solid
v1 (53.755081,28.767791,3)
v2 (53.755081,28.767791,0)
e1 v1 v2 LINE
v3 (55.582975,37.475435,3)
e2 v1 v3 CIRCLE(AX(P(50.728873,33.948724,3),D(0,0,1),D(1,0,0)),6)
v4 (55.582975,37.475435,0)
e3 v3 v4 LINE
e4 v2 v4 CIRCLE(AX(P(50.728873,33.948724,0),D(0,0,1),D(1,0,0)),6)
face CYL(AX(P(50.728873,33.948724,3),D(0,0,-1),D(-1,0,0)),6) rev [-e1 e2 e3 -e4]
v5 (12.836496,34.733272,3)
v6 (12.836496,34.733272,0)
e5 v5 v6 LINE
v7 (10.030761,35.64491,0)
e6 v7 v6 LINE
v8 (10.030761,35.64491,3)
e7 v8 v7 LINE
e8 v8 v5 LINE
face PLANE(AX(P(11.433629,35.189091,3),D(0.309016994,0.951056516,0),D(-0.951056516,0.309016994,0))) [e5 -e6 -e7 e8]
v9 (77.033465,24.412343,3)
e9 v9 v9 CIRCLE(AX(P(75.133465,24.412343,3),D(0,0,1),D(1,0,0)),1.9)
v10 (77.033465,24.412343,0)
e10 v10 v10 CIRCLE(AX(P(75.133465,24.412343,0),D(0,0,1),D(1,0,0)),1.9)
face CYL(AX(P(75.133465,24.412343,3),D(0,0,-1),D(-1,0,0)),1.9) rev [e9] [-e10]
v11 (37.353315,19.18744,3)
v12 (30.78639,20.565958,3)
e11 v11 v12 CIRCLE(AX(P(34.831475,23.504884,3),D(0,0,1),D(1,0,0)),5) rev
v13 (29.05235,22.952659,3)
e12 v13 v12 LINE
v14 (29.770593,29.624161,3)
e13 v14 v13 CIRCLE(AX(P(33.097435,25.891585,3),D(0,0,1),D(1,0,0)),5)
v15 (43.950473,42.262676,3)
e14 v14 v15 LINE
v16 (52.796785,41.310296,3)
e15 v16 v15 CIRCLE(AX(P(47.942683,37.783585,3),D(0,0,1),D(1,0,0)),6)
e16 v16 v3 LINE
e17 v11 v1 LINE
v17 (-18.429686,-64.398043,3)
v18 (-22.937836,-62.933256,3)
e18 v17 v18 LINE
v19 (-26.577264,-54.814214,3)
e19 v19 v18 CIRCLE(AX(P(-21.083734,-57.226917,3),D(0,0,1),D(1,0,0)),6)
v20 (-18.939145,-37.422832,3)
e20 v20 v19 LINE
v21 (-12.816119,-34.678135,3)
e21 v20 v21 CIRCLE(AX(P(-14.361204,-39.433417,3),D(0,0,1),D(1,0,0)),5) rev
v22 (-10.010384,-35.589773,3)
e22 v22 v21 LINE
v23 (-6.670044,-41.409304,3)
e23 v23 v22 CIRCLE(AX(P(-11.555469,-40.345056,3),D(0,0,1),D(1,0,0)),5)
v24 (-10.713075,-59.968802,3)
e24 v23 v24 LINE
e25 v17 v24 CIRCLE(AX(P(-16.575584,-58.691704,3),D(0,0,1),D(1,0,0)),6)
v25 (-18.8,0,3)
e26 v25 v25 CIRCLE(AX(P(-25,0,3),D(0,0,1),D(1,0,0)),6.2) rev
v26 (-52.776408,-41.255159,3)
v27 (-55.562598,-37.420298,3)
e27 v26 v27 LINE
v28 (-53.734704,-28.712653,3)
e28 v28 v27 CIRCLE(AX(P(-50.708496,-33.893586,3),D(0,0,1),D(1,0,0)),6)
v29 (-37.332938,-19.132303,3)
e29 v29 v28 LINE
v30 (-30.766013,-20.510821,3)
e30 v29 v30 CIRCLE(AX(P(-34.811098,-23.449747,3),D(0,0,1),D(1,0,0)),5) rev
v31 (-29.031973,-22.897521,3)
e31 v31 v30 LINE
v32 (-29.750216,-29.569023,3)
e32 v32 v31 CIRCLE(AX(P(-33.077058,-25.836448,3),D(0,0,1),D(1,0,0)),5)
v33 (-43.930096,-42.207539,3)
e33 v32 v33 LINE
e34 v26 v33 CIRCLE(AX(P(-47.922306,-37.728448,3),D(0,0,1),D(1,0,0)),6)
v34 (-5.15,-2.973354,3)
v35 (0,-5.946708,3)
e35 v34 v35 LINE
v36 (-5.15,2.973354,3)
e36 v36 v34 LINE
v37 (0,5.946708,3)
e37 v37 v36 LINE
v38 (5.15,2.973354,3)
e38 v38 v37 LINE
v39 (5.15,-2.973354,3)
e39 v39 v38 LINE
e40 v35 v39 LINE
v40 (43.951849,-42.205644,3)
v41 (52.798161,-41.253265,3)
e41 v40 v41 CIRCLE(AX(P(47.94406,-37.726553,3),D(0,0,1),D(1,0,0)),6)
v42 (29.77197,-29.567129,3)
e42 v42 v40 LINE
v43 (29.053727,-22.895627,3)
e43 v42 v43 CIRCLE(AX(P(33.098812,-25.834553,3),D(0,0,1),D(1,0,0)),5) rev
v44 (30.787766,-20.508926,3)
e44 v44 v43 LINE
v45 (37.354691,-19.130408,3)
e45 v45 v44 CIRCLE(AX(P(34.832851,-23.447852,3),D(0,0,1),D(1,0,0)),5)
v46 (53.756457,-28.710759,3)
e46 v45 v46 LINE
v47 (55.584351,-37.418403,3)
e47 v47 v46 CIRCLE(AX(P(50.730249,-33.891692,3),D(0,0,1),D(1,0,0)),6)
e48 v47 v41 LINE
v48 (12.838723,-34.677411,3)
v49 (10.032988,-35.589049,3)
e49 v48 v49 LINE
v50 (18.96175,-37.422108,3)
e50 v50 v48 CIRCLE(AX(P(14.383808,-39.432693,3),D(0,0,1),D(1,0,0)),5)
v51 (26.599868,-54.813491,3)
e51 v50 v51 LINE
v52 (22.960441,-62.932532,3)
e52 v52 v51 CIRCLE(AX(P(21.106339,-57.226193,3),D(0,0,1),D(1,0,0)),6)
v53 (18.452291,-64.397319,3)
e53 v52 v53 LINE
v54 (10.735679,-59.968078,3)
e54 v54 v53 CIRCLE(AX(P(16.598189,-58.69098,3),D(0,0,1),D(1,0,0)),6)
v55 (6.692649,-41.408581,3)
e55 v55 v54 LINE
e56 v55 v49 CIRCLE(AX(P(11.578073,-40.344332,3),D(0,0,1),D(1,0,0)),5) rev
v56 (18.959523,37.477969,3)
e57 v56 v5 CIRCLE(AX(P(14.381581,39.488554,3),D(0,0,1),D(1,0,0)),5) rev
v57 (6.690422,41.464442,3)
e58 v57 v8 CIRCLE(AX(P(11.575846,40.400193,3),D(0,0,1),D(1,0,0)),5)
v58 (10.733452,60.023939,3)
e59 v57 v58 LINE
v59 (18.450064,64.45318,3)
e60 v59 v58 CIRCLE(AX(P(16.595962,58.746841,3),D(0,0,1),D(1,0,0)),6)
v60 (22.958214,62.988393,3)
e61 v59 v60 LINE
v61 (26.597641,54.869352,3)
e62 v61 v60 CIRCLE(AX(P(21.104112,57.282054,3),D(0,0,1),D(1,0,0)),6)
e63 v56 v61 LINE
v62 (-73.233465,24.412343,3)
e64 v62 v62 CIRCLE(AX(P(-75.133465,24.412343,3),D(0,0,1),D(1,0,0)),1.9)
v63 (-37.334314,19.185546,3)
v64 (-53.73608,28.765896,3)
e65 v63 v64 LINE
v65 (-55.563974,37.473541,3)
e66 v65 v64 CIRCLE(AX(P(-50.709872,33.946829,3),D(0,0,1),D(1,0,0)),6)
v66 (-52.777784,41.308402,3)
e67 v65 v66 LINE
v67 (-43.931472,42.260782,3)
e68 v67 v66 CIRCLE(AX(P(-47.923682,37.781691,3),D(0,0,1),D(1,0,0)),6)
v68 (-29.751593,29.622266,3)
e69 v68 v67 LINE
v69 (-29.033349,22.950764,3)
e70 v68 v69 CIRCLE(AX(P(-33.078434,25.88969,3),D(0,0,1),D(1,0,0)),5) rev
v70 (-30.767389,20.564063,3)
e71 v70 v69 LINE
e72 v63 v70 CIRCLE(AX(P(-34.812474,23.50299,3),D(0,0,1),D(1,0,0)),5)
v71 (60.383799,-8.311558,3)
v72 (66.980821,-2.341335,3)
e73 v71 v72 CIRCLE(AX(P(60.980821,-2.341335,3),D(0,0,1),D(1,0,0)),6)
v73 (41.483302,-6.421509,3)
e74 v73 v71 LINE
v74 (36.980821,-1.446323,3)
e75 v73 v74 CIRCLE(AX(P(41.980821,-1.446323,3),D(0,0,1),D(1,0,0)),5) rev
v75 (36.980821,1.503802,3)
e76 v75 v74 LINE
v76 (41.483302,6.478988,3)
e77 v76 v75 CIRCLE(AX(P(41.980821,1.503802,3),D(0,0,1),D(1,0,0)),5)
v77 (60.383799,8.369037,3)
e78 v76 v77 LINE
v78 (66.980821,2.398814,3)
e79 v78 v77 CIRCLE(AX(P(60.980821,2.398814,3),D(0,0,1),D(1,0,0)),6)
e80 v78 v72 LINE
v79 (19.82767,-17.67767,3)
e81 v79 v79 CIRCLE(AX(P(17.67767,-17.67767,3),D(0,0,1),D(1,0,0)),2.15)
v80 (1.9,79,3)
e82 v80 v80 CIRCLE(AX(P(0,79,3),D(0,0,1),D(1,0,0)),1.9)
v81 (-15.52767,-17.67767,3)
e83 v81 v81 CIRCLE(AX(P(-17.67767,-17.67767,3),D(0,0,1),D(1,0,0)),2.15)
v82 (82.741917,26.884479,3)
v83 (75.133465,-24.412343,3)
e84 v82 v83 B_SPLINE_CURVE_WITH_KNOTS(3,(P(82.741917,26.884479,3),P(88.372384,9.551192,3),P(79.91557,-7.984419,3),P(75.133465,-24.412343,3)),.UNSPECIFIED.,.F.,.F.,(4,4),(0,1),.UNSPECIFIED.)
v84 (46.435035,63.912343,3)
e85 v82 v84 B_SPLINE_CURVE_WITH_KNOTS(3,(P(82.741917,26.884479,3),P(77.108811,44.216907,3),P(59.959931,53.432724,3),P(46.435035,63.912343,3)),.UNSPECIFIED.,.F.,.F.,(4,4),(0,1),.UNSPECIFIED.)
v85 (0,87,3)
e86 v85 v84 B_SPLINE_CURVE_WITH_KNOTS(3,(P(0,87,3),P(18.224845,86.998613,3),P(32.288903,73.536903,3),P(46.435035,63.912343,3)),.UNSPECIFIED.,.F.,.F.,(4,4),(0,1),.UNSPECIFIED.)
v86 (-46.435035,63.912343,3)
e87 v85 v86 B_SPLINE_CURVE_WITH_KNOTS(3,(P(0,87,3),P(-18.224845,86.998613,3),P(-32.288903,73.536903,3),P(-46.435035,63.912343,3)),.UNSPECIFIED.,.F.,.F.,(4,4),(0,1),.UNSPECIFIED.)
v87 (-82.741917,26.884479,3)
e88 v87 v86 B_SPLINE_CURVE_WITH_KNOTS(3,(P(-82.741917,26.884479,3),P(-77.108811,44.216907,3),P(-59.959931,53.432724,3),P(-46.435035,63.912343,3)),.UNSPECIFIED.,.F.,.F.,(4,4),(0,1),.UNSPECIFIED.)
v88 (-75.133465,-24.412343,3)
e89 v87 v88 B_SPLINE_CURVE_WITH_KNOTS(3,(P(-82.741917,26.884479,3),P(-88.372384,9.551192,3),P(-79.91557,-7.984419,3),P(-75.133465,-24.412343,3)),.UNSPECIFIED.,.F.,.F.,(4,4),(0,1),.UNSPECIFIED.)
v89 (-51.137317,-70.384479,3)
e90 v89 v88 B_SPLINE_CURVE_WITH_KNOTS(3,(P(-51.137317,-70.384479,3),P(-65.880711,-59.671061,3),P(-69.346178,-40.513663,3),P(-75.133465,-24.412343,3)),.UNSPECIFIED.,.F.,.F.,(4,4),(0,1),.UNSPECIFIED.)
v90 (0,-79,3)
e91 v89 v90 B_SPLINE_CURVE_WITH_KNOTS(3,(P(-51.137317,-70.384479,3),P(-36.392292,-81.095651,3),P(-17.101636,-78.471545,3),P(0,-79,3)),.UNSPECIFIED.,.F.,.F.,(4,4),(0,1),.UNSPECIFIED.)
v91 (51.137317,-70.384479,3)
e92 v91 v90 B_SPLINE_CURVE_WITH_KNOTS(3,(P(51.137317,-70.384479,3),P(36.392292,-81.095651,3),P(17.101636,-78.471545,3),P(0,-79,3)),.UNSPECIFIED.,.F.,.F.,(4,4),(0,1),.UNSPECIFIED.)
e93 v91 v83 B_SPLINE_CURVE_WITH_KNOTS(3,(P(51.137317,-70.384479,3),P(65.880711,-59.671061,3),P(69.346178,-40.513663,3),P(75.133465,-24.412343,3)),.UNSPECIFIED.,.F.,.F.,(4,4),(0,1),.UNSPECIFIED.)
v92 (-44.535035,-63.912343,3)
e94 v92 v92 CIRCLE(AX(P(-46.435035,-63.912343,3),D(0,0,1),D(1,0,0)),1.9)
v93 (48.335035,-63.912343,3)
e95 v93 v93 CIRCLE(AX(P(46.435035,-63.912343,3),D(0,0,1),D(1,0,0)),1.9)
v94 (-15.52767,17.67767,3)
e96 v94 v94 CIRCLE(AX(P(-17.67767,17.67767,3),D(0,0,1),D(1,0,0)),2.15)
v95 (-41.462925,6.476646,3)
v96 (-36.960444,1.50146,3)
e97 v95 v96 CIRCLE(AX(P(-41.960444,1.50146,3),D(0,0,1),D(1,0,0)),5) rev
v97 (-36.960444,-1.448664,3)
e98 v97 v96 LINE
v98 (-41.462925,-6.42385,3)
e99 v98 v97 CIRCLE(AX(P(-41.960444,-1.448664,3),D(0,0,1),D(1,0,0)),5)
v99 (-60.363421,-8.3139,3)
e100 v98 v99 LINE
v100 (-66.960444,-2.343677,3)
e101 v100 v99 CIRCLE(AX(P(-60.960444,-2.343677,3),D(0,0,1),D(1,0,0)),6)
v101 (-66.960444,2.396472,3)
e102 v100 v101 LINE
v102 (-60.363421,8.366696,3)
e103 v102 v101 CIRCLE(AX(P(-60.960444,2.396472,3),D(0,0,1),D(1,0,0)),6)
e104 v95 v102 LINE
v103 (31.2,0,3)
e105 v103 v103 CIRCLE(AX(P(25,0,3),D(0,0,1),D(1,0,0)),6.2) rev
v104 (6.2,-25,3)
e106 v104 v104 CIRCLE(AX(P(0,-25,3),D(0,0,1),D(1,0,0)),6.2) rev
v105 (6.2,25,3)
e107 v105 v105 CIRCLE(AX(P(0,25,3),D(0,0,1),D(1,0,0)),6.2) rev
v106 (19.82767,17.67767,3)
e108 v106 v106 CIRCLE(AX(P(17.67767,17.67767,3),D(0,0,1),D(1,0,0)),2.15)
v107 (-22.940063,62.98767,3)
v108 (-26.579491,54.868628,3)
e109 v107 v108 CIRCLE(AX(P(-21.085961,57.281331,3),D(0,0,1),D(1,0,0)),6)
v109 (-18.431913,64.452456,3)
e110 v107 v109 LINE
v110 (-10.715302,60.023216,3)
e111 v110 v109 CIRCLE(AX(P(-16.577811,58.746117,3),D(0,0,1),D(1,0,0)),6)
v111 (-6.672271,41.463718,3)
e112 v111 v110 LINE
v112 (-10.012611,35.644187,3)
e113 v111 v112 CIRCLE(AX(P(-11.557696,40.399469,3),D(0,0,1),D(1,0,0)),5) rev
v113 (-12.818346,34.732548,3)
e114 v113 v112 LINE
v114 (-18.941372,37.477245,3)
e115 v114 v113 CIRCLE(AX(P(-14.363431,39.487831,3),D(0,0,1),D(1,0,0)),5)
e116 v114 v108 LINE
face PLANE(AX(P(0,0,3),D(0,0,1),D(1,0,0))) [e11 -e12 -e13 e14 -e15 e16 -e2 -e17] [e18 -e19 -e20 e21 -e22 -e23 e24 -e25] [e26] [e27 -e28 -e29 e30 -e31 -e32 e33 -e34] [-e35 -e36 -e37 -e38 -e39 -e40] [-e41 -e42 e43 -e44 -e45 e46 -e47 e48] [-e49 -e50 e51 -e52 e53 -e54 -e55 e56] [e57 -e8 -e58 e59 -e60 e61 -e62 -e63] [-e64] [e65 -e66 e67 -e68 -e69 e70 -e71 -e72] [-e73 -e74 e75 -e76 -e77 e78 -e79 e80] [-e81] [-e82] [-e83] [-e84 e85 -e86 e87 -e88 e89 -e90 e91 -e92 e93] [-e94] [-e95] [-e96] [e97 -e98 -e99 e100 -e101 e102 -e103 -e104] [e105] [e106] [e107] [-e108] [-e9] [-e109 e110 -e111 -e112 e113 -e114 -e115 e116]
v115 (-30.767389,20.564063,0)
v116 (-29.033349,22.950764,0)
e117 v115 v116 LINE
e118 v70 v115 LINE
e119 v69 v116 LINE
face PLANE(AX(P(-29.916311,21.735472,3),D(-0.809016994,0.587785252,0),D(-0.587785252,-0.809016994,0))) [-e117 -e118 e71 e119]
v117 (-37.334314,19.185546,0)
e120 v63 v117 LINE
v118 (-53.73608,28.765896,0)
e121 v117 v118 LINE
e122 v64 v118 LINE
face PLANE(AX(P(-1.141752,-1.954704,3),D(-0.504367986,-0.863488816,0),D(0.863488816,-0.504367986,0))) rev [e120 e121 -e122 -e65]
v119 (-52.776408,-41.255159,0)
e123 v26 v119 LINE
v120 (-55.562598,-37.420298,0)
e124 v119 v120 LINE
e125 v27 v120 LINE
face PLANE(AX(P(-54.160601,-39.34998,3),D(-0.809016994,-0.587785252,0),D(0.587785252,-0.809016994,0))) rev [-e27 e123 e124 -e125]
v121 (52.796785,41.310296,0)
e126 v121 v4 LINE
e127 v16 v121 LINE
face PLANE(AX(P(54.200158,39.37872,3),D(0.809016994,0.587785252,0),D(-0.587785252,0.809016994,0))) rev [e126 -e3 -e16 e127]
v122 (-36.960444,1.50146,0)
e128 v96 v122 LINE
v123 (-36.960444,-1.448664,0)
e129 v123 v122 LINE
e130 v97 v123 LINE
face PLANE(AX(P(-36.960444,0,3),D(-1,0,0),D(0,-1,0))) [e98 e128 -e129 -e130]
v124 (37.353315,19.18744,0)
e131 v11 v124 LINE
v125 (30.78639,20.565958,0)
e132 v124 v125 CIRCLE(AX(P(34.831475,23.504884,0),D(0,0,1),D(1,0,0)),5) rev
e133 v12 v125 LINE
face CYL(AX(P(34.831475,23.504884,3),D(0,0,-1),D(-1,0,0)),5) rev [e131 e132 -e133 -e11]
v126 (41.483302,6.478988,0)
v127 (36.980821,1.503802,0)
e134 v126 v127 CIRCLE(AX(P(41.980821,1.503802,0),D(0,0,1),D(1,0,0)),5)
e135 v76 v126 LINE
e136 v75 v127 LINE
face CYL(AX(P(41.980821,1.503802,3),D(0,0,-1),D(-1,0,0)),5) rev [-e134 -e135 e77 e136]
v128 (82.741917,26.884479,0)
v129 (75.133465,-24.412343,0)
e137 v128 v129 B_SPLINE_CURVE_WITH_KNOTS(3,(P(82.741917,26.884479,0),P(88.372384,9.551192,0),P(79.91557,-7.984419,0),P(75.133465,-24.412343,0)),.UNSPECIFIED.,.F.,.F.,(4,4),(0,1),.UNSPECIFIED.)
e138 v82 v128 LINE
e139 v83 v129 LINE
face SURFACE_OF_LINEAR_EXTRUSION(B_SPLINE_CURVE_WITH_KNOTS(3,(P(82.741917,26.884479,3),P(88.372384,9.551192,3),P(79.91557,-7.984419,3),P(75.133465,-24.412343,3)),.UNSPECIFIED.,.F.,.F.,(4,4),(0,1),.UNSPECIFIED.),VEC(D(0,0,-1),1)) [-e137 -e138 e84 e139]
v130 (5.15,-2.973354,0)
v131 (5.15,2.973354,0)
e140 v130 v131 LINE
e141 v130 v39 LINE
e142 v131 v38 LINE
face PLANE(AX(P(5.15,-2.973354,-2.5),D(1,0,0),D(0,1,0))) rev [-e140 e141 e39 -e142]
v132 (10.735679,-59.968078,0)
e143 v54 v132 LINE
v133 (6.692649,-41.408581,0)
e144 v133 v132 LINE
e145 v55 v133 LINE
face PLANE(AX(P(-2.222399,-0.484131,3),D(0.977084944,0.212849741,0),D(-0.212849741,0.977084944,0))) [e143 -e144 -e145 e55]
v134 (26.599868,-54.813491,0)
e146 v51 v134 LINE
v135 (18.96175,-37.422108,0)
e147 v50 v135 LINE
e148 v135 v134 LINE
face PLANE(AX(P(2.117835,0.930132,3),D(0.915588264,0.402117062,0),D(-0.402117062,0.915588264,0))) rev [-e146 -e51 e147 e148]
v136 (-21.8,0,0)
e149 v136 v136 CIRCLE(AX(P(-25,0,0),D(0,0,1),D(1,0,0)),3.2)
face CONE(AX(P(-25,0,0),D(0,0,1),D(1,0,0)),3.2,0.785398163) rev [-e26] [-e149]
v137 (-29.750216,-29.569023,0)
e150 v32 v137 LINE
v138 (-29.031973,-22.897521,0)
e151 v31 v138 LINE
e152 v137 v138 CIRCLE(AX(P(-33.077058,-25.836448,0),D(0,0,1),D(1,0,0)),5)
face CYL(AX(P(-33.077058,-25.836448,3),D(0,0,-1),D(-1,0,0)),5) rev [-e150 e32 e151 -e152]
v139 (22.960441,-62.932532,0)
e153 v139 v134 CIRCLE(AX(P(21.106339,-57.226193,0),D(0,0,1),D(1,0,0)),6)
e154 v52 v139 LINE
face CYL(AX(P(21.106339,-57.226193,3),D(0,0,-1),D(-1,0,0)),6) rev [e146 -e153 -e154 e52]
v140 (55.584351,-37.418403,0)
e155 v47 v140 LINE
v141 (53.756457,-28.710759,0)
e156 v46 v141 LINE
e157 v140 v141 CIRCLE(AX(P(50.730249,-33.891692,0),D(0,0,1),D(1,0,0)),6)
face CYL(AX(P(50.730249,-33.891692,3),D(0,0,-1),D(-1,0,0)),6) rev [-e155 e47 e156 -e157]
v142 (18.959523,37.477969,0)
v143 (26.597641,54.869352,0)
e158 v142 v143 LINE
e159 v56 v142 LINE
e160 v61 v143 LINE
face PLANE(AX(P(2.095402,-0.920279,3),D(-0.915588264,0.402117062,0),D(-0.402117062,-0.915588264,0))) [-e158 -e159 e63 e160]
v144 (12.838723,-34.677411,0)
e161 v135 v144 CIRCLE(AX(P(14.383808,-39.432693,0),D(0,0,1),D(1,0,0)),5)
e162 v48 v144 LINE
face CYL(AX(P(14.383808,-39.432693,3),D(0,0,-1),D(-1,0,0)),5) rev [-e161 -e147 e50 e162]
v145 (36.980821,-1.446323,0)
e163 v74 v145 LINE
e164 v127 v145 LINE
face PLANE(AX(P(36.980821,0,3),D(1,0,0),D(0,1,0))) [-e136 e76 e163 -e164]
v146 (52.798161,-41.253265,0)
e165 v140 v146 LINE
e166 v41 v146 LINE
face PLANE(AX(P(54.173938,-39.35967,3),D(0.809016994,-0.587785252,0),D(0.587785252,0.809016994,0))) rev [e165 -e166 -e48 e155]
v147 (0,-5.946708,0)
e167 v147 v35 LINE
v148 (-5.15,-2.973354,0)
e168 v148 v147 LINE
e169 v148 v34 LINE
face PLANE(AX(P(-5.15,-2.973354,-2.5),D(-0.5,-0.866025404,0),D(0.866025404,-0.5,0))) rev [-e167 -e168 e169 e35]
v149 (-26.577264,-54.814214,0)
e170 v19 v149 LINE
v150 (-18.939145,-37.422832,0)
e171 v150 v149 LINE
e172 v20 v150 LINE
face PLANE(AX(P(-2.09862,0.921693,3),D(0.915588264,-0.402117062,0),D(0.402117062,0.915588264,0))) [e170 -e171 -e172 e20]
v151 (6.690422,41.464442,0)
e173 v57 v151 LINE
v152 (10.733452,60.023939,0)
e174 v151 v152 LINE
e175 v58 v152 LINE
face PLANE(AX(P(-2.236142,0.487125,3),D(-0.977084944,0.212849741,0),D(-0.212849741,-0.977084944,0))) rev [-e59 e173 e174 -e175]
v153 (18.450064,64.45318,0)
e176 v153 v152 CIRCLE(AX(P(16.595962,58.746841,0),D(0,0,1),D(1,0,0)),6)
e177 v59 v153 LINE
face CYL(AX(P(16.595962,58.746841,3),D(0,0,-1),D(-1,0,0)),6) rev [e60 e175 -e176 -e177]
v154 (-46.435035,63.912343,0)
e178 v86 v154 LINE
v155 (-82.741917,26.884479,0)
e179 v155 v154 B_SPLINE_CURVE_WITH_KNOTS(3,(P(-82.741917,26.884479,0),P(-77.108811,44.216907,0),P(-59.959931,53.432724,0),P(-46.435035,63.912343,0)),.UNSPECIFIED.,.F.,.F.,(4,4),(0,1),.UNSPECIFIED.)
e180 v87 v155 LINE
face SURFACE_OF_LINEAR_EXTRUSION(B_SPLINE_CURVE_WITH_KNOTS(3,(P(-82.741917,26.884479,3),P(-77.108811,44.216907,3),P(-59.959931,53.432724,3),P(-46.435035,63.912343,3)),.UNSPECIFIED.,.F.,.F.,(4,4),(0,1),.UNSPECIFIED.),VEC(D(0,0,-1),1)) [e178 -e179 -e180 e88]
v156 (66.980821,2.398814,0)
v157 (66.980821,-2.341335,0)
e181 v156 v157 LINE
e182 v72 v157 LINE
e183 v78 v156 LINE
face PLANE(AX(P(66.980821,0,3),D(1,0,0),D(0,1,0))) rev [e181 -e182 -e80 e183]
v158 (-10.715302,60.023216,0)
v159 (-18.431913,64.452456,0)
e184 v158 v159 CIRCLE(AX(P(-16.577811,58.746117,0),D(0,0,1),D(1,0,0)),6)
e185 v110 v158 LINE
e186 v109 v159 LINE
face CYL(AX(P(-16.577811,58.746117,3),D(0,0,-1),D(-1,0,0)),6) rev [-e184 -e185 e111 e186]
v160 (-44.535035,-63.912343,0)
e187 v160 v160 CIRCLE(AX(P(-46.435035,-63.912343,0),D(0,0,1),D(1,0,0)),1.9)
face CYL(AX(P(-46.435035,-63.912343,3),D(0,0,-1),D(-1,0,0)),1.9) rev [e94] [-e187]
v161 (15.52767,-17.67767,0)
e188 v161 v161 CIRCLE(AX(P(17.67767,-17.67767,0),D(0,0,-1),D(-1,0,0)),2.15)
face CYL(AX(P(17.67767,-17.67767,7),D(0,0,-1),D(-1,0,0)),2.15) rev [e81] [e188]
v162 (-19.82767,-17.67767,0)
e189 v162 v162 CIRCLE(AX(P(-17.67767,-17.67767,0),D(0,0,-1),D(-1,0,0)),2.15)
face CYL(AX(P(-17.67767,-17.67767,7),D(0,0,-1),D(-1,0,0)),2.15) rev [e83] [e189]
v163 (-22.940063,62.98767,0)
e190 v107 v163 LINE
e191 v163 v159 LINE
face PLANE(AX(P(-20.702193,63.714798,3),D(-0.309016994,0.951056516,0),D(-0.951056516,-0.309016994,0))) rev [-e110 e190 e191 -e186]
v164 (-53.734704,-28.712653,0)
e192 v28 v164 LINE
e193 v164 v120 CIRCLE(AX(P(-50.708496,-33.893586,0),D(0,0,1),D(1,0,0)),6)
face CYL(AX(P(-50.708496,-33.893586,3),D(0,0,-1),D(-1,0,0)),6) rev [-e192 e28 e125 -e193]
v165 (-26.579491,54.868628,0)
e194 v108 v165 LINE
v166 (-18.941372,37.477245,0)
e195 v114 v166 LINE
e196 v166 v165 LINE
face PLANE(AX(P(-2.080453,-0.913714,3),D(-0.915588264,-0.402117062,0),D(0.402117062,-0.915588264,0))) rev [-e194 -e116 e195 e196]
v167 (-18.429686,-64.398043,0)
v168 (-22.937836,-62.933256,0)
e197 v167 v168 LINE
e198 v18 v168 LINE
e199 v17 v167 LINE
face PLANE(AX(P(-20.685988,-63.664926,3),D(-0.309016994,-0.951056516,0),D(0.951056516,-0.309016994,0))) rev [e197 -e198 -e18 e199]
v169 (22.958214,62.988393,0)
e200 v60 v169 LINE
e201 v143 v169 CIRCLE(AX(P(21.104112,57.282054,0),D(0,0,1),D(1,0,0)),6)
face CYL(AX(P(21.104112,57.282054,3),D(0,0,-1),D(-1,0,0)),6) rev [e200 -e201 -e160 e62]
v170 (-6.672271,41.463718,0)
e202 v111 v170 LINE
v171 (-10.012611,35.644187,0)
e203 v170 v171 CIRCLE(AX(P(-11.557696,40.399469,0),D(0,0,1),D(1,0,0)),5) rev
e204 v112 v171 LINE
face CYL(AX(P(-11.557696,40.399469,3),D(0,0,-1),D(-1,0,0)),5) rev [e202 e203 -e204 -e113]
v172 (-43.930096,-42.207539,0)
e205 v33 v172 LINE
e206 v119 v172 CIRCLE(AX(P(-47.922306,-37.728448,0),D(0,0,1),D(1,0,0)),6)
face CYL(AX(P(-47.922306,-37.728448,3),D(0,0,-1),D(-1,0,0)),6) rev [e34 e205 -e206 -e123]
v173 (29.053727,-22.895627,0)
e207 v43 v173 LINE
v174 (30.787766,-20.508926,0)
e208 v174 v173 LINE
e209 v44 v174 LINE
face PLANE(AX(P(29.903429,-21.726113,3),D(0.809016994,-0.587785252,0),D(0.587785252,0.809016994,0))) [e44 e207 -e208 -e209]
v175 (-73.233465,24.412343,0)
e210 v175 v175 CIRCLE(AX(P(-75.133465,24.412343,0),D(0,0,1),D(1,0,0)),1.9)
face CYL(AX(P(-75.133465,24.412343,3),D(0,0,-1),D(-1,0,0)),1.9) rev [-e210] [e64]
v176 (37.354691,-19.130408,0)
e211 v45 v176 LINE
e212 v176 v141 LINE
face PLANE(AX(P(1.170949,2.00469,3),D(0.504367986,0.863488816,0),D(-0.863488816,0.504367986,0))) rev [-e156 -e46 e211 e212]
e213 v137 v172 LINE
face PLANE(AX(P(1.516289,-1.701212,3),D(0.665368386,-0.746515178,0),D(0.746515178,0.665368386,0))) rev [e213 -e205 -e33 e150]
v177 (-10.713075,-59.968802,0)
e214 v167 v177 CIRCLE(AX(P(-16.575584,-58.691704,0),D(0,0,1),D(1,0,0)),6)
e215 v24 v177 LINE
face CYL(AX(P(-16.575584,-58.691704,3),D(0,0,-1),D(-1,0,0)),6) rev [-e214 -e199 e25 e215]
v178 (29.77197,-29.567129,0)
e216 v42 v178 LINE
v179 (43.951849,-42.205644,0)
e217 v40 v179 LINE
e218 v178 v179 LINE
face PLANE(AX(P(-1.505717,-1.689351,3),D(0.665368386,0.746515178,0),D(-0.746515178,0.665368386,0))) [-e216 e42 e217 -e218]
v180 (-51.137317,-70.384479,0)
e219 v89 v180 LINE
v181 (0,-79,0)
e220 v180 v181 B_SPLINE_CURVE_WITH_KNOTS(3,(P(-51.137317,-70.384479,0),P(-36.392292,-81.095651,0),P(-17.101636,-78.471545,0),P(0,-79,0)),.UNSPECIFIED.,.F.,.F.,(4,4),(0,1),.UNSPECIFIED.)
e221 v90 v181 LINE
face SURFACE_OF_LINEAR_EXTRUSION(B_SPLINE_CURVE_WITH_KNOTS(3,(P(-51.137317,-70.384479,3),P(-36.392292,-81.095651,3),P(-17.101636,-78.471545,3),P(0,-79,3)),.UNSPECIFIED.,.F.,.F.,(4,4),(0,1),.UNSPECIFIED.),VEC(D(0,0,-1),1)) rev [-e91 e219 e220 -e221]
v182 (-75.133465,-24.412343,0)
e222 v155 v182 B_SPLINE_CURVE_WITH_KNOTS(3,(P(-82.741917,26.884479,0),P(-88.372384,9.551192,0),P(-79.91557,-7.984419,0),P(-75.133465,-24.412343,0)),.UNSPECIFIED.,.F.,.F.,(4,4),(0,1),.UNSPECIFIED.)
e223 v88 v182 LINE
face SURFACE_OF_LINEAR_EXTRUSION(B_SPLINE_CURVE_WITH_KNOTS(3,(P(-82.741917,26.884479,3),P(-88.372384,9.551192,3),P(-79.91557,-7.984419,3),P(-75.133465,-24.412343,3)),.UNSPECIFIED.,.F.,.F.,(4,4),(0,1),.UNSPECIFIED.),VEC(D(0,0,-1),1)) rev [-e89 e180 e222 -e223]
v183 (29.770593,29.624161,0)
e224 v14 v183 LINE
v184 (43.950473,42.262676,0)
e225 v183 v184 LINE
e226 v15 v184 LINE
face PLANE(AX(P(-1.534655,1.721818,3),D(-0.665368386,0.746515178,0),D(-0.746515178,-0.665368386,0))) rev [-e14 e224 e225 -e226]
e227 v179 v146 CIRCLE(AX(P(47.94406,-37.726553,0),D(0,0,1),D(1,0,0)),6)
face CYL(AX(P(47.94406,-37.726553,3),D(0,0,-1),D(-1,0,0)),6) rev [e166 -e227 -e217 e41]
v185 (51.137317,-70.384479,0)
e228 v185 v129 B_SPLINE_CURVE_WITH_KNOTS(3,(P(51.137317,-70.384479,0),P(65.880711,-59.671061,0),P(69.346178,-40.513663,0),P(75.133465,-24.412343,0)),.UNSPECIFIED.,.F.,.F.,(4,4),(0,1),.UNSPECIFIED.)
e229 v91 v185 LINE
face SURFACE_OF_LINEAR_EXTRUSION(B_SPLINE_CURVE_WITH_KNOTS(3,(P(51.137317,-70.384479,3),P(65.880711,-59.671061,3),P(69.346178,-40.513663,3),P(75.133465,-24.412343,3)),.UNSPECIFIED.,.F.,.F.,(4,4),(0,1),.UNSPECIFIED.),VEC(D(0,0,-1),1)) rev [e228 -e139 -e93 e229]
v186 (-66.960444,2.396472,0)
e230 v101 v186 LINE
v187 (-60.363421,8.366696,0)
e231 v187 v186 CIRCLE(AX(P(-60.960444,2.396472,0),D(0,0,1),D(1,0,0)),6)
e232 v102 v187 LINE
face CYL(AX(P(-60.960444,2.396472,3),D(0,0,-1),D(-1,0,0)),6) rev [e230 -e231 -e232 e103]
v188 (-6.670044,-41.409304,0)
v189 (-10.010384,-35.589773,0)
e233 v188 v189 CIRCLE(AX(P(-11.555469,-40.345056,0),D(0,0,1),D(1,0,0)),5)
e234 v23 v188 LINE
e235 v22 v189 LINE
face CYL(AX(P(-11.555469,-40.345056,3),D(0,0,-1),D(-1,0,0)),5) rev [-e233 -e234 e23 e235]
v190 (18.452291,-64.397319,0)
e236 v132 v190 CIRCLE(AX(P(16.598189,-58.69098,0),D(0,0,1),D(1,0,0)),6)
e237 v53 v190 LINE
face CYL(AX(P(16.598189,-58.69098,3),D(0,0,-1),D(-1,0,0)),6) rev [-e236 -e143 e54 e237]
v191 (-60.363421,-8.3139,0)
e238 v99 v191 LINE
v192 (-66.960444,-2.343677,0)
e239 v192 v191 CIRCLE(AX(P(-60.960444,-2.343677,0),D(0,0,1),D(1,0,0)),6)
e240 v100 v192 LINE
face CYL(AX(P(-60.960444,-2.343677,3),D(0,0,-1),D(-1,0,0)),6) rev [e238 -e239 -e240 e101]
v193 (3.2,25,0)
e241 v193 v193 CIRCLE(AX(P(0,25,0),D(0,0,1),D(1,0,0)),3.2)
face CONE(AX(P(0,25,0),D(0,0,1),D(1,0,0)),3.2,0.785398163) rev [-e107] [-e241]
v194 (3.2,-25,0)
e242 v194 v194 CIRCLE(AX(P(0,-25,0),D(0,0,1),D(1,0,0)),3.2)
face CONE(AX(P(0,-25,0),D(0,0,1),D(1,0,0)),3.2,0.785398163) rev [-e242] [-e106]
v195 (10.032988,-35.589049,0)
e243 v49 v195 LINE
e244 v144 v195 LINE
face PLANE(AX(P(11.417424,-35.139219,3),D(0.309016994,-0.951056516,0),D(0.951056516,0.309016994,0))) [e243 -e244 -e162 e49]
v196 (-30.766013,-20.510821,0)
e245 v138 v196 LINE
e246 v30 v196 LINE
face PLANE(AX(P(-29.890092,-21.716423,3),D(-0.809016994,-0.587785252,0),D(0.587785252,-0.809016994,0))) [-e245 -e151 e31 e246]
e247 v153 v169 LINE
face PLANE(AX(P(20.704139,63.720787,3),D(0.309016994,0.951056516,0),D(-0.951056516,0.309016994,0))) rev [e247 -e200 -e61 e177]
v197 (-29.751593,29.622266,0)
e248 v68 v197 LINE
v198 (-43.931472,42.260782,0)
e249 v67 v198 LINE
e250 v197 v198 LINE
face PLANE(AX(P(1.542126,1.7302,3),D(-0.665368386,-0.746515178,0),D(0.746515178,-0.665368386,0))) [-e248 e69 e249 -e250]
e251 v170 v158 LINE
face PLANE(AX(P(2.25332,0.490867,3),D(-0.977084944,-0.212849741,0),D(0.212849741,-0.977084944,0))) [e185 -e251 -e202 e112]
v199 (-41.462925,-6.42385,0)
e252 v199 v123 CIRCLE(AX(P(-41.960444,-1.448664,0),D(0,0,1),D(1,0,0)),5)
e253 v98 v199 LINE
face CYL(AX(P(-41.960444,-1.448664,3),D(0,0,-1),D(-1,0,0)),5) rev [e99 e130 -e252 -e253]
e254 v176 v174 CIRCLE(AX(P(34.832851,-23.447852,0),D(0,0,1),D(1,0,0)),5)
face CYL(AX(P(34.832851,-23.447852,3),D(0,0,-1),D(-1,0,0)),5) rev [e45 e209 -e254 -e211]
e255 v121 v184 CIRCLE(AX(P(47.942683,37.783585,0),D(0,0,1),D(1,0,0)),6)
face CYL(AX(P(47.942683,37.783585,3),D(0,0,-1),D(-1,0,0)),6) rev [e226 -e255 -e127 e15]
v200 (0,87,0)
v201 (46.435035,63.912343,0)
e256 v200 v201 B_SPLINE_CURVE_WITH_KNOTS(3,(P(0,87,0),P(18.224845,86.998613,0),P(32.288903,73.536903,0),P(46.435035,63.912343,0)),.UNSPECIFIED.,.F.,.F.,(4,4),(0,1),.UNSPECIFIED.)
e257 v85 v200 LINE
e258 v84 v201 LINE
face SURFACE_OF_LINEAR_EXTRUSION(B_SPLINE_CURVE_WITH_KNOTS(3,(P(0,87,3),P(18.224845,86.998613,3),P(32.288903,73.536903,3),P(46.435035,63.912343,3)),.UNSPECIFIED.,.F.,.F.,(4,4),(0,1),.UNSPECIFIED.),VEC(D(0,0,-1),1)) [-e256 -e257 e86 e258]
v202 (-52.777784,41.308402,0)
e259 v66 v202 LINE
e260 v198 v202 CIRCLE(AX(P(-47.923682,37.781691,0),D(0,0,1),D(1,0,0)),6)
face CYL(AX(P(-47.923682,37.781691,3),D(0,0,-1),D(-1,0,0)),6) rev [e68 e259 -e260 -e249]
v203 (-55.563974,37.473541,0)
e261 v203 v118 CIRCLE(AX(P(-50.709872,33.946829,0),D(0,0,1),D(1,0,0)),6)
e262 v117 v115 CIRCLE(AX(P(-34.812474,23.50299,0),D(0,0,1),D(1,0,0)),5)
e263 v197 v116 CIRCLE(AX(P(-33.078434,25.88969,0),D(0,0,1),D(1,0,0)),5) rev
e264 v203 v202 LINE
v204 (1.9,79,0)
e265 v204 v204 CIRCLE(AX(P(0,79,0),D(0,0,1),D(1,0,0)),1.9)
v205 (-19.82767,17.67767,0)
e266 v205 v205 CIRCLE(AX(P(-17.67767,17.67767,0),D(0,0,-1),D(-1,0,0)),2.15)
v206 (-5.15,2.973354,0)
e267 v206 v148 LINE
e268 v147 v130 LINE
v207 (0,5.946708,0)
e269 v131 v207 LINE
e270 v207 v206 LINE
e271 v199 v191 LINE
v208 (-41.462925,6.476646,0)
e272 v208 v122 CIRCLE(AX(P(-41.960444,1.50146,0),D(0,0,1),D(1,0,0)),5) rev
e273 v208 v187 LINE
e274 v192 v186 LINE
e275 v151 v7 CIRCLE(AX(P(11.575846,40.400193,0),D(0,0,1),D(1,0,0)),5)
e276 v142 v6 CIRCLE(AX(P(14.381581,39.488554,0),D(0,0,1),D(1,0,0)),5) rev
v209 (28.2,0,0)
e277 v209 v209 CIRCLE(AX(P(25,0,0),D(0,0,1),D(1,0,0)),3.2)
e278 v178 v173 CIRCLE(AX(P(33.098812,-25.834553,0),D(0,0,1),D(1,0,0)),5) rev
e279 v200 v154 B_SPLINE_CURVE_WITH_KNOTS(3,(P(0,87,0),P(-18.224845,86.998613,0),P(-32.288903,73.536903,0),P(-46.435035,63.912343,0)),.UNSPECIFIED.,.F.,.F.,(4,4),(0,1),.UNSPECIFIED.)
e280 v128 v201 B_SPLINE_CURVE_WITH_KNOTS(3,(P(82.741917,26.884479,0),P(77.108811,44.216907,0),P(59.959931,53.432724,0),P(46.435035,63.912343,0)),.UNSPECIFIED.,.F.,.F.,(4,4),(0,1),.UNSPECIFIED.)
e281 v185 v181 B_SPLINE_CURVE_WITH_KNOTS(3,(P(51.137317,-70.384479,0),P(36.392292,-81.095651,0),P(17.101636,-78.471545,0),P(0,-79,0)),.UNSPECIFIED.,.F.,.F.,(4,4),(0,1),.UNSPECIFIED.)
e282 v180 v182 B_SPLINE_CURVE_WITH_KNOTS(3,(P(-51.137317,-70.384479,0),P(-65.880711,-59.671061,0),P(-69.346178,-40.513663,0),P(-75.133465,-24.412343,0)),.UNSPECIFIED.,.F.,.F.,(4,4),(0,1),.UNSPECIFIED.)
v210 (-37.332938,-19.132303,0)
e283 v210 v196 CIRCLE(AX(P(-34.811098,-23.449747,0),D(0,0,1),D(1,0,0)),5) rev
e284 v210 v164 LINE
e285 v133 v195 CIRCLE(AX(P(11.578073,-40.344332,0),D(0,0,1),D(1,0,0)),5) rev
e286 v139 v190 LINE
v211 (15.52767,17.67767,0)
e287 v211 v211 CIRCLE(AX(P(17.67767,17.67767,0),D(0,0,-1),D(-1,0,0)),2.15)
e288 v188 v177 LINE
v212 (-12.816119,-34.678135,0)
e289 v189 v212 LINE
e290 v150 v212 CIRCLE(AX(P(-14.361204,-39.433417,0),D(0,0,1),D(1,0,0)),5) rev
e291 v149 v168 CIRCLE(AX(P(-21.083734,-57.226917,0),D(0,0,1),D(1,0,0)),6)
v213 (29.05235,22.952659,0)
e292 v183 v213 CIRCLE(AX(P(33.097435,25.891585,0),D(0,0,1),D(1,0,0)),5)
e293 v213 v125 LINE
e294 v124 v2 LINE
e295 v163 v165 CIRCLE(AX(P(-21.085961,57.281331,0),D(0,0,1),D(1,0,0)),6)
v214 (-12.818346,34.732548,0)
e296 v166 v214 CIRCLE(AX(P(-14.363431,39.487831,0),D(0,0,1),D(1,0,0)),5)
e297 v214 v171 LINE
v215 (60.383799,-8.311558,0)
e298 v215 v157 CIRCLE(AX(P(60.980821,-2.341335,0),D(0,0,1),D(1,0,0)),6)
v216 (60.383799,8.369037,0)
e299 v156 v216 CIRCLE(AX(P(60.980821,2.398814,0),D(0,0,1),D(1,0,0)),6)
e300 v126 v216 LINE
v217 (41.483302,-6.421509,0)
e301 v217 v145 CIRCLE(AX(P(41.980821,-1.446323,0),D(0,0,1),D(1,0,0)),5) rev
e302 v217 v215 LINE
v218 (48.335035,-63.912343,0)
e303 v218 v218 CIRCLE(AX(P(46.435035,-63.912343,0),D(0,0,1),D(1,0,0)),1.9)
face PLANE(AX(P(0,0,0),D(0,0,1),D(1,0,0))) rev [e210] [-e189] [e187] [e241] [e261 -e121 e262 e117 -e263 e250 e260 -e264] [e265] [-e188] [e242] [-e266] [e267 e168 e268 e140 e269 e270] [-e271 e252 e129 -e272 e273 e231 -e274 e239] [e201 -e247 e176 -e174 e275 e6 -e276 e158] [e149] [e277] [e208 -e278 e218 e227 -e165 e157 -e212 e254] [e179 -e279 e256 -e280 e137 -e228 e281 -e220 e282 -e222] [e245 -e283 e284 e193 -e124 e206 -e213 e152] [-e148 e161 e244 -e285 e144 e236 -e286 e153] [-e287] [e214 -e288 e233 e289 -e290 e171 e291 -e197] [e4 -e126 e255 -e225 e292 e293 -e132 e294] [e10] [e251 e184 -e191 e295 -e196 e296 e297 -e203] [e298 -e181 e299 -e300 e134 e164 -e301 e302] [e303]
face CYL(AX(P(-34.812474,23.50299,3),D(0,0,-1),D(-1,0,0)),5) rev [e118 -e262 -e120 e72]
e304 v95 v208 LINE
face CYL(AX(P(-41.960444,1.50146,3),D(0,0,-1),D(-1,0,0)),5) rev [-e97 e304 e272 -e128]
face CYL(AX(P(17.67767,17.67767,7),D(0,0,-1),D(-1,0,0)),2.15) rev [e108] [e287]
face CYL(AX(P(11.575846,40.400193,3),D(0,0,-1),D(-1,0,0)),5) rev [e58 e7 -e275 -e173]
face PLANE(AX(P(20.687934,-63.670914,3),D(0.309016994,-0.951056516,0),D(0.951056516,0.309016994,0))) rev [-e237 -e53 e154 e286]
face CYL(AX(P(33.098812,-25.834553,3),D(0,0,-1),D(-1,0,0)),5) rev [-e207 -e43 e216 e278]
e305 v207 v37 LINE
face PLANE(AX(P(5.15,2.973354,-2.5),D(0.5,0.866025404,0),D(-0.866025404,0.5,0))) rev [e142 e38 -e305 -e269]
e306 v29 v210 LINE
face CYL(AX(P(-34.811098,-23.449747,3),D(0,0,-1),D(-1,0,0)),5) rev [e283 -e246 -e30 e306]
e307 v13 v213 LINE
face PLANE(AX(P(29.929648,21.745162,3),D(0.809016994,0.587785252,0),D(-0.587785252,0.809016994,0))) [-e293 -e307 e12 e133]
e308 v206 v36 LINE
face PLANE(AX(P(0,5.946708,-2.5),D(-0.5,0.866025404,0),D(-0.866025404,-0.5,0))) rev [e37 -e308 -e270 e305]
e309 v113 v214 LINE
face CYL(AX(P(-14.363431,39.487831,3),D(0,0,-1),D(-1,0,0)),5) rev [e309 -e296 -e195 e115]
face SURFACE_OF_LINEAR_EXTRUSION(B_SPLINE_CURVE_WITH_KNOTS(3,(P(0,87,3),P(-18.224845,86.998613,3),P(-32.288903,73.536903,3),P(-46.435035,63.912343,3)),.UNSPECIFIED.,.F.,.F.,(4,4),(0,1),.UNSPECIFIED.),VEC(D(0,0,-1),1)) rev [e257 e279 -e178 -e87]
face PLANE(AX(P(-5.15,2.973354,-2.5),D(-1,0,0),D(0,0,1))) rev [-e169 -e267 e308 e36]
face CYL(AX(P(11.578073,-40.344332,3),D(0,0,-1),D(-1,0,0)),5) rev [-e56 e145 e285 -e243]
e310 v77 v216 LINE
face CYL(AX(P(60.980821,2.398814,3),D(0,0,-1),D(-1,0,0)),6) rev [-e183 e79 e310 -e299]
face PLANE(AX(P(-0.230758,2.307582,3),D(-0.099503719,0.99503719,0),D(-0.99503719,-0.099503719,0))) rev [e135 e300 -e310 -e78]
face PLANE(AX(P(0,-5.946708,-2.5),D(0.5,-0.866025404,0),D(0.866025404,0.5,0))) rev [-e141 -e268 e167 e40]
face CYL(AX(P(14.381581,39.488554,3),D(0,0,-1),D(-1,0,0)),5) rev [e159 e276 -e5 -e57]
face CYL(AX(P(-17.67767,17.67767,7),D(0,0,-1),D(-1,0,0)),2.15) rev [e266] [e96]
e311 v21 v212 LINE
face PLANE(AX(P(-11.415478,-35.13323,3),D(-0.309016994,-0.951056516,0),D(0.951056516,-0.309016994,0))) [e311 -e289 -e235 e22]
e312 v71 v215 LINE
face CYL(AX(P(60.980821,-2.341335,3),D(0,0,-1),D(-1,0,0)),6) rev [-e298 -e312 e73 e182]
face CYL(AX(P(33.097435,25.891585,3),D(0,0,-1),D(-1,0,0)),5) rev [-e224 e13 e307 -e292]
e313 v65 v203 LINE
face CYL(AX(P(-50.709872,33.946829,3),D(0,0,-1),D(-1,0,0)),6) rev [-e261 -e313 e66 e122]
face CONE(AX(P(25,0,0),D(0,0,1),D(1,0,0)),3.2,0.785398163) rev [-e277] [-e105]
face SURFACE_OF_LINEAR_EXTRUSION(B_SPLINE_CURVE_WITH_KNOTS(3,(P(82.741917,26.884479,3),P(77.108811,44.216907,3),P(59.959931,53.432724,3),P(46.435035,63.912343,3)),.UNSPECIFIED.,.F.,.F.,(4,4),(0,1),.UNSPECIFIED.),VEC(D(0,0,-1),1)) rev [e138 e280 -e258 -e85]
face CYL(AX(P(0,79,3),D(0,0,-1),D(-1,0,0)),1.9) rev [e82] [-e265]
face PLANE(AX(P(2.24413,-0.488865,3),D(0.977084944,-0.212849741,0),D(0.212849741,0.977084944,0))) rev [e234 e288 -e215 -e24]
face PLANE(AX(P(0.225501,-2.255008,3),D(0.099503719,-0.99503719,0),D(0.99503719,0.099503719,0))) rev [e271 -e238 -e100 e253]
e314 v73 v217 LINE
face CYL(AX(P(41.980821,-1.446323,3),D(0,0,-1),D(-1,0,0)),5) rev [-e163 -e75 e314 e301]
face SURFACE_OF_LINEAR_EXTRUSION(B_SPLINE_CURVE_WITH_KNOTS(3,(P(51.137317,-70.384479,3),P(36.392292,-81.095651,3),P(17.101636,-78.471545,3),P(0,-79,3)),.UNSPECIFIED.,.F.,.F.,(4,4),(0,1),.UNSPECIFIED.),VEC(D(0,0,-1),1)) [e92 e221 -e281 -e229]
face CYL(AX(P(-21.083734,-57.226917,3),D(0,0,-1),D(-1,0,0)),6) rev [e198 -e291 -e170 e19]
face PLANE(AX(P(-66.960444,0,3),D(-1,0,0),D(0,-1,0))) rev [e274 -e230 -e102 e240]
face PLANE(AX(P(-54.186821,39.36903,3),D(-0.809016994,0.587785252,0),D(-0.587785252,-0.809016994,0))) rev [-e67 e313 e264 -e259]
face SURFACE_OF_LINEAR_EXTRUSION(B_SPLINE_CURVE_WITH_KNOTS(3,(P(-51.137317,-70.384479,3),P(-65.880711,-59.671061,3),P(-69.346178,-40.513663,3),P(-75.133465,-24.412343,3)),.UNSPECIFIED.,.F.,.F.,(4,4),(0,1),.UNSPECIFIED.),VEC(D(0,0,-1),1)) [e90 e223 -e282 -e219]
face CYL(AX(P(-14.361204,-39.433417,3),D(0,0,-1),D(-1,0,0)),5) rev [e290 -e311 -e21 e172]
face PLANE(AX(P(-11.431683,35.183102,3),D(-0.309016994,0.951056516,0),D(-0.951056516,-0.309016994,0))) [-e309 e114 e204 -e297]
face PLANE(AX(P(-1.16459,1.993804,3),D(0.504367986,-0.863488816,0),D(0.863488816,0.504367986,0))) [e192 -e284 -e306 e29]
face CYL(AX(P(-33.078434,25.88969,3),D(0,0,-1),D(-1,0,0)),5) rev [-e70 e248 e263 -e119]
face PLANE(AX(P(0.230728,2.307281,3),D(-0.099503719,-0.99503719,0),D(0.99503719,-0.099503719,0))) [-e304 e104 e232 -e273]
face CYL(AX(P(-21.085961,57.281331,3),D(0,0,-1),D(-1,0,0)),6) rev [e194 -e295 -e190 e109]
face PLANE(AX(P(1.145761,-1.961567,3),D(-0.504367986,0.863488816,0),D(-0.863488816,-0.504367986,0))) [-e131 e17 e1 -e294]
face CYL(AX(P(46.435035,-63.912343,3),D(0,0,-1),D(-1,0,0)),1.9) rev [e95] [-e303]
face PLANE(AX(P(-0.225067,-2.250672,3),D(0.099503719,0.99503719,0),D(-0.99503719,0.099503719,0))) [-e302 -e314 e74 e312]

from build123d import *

# Parameters (mm, degrees)
SZKIC1_R                    = 3.3
SZKIC1_R_2                  = 3.2
SZKIC1_R_3                  = 1.9
DODANIE_WYCI_GNI_CIE1_DEPTH = 3
SKETCH1_R                   = 2.15
CUT_EXTRUDE1_DEPTH          = 7
CHAMFER1_SIZE               = 3
CUT_EXTRUDE2_DEPTH          = 5.5


with BuildPart() as part:
    # Szkic1 → Dodanie-wyciągnięcie1 (new body)
    with BuildSketch(Plane.XY):
        with BuildLine():
            add(Edge.make_bspline(
                [(0, 87), (18.224844976, 86.998612649), (32.288902875, 73.536902698), (46.435034931, 63.912342556)],
                knots=[0, 0, 0, 0, 1, 1, 1, 1], degree=3))
            add(Edge.make_bspline(
                [(82.741916918, 26.884478511), (77.108810651, 44.216907368), (59.959930782, 53.43272413), (46.435034931, 63.912342556)],
                knots=[0, 0, 0, 0, 1, 1, 1, 1], degree=3))
            add(Edge.make_bspline(
                [(82.741916918, 26.884478511), (88.372384286, 9.551192223), (79.915570217, -7.984418835), (75.133464787, -24.412342556)],
                knots=[0, 0, 0, 0, 1, 1, 1, 1], degree=3))
            add(Edge.make_bspline(
                [(51.137316949, -70.384478511), (65.88071079, -59.671061018), (69.346178061, -40.513663074), (75.133464787, -24.412342556)],
                knots=[0, 0, 0, 0, 1, 1, 1, 1], degree=3))
            add(Edge.make_bspline(
                [(51.137316949, -70.384478511), (36.39229218, -81.095651222), (17.10163575, -78.471544919), (0, -79)],
                knots=[0, 0, 0, 0, 1, 1, 1, 1], degree=3))
            add(Edge.make_bspline(
                [(-51.137316949, -70.384478511), (-36.39229218, -81.095651222), (-17.10163575, -78.471544919), (0, -79)],
                knots=[0, 0, 0, 0, 1, 1, 1, 1], degree=3))
            add(Edge.make_bspline(
                [(-51.137316949, -70.384478511), (-65.88071079, -59.671061018), (-69.346178061, -40.513663074), (-75.133464787, -24.412342556)],
                knots=[0, 0, 0, 0, 1, 1, 1, 1], degree=3))
            add(Edge.make_bspline(
                [(-82.741916918, 26.884478511), (-88.372384286, 9.551192223), (-79.915570217, -7.984418835), (-75.133464787, -24.412342556)],
                knots=[0, 0, 0, 0, 1, 1, 1, 1], degree=3))
            add(Edge.make_bspline(
                [(-82.741916918, 26.884478511), (-77.108810651, 44.216907368), (-59.959930782, 53.43272413), (-46.435034931, 63.912342556)],
                knots=[0, 0, 0, 0, 1, 1, 1, 1], degree=3))
            add(Edge.make_bspline(
                [(0, 87), (-18.224844976, 86.998612649), (-32.288902875, 73.536902698), (-46.435034931, 63.912342556)],
                knots=[0, 0, 0, 0, 1, 1, 1, 1], degree=3))
        make_face()
        Circle(SZKIC1_R, mode=Mode.SUBTRACT)
        with Locations((0, 25)):
            Circle(SZKIC1_R_2, mode=Mode.SUBTRACT)
        with Locations((0, 79)):
            Circle(SZKIC1_R_3, mode=Mode.SUBTRACT)
        with Locations((25, 0)):
            Circle(SZKIC1_R_2, mode=Mode.SUBTRACT)
        with Locations((0, -25)):
            Circle(SZKIC1_R_2, mode=Mode.SUBTRACT)
        with Locations((-25, 0)):
            Circle(SZKIC1_R_2, mode=Mode.SUBTRACT)
        with Locations((75.133464787, 24.412342556)):
            Circle(SZKIC1_R_3, mode=Mode.SUBTRACT)
        with Locations((46.435034931, -63.912342556)):
            Circle(SZKIC1_R_3, mode=Mode.SUBTRACT)
        with Locations((-46.435034931, -63.912342556)):
            Circle(SZKIC1_R_3, mode=Mode.SUBTRACT)
        with Locations((-75.133464787, 24.412342556)):
            Circle(SZKIC1_R_3, mode=Mode.SUBTRACT)
        with BuildLine():
            Line((10.030761285, 35.644910387), (12.836496299, 34.733271819))
            ThreePointArc((12.836496299, 34.733271819), (16.426794018, 34.925977845), (18.959522589, 37.477969089))
            Line((18.959522589, 37.477969089), (26.597641156, 54.869351783))
            ThreePointArc((26.597641156, 54.869351783), (26.579203441, 59.736309453), (22.958213542, 62.988393254))
            Line((22.958213542, 62.988393254), (18.450063705, 64.45317993))
            ThreePointArc((18.450063705, 64.45317993), (13.609094442, 63.950553329), (10.733452075, 60.02393928))
            Line((10.733452075, 60.02393928), (6.690421537, 41.464441676))
            ThreePointArc((6.690421537, 41.464441676), (7.239419176, 37.911136888), (10.030761285, 35.644910387))
        make_face(mode=Mode.SUBTRACT)
        with BuildLine():
            Line((29.052350399, 22.952658594), (30.786390001, 20.565957836))
            ThreePointArc((30.786390001, 20.565957836), (33.804271631, 18.611536236), (37.353314904, 19.18744002))
            Line((37.353314904, 19.18744002), (53.755080895, 28.767790725))
            ThreePointArc((53.755080895, 28.767790725), (56.600890412, 32.716079608), (55.582974944, 37.475435132))
            Line((55.582974944, 37.475435132), (52.796785118, 41.310296435))
            ThreePointArc((52.796785118, 41.310296435), (48.584922212, 43.749113313), (43.950472839, 42.262675991))
            Line((43.950472839, 42.262675991), (29.770593443, 29.624160747))
            ThreePointArc((29.770593443, 29.624160747), (28.126161711, 26.426784072), (29.052350399, 22.952658594))
        make_face(mode=Mode.SUBTRACT)
        with BuildLine():
            Line((36.98082083, 1.50380164), (36.98082083, -1.446322739))
            ThreePointArc((36.98082083, -1.446322739), (38.273558162, -4.801349343), (41.483302234, -6.42150869))
            Line((41.483302234, -6.42150869), (60.383798515, -8.311558318))
            ThreePointArc((60.383798515, -8.311558318), (65.006852754, -6.790050378), (66.98082083, -2.341335177))
            Line((66.98082083, -2.341335177), (66.98082083, 2.398814078))
            ThreePointArc((66.98082083, 2.398814078), (65.006852754, 6.847529279), (60.383798515, 8.369037219))
            Line((60.383798515, 8.369037219), (41.483302234, 6.478987591))
            ThreePointArc((41.483302234, 6.478987591), (38.273558162, 4.858828243), (36.98082083, 1.50380164))
        make_face(mode=Mode.SUBTRACT)
        with BuildLine():
            Line((30.787766351, -20.508926139), (29.053726749, -22.895626897))
            ThreePointArc((29.053726749, -22.895626897), (28.127538061, -26.369752375), (29.771969793, -29.56712905))
            Line((29.771969793, -29.56712905), (43.951849189, -42.205644294))
            ThreePointArc((43.951849189, -42.205644294), (48.586298562, -43.692081616), (52.798161469, -41.253264738))
            Line((52.798161469, -41.253264738), (55.584351294, -37.418403435))
            ThreePointArc((55.584351294, -37.418403435), (56.602266762, -32.659047911), (53.756457245, -28.710759028))
            Line((53.756457245, -28.710759028), (37.354691254, -19.130408323))
            ThreePointArc((37.354691254, -19.130408323), (33.805647981, -18.554504539), (30.787766351, -20.508926139))
        make_face(mode=Mode.SUBTRACT)
        with BuildLine():
            Line((12.83872328, -34.677410915), (10.032988266, -35.589049483))
            ThreePointArc((10.032988266, -35.589049483), (7.241646157, -37.855275984), (6.692648518, -41.408580772))
            Line((6.692648518, -41.408580772), (10.735679056, -59.968078377))
            ThreePointArc((10.735679056, -59.968078377), (13.611321423, -63.894692425), (18.452290686, -64.397319026))
            Line((18.452290686, -64.397319026), (22.960440523, -62.93253235))
            ThreePointArc((22.960440523, -62.93253235), (26.581430423, -59.680448549), (26.599868138, -54.813490879))
            Line((26.599868138, -54.813490879), (18.96174957, -37.422108185))
            ThreePointArc((18.96174957, -37.422108185), (16.429020999, -34.870116941), (12.83872328, -34.677410915))
        make_face(mode=Mode.SUBTRACT)
        with BuildLine():
            Line((-10.010383995, -35.589773073), (-12.81611901, -34.678134505))
            ThreePointArc((-12.81611901, -34.678134505), (-16.406416729, -34.870840531), (-18.939145299, -37.422831775))
            Line((-18.939145299, -37.422831775), (-26.577263867, -54.814214469))
            ThreePointArc((-26.577263867, -54.814214469), (-26.558826152, -59.681172139), (-22.937836252, -62.93325594))
            Line((-22.937836252, -62.93325594), (-18.429686416, -64.398042616))
            ThreePointArc((-18.429686416, -64.398042616), (-13.588717152, -63.895416015), (-10.713074786, -59.968801967))
            Line((-10.713074786, -59.968801967), (-6.670044248, -41.409304362))
            ThreePointArc((-6.670044248, -41.409304362), (-7.219041887, -37.855999574), (-10.010383995, -35.589773073))
        make_face(mode=Mode.SUBTRACT)
        with BuildLine():
            Line((-29.03197311, -22.89752128), (-30.766012712, -20.510820522))
            ThreePointArc((-30.766012712, -20.510820522), (-33.783894342, -18.556398922), (-37.332937615, -19.132302706))
            Line((-37.332937615, -19.132302706), (-53.734703606, -28.712653412))
            ThreePointArc((-53.734703606, -28.712653412), (-56.580513122, -32.660942294), (-55.562597655, -37.420297818))
            Line((-55.562597655, -37.420297818), (-52.776407829, -41.255159121))
            ThreePointArc((-52.776407829, -41.255159121), (-48.564544923, -43.693975999), (-43.930095549, -42.207538678))
            Line((-43.930095549, -42.207538678), (-29.750216154, -29.569023433))
            ThreePointArc((-29.750216154, -29.569023433), (-28.105784422, -26.371646758), (-29.03197311, -22.89752128))
        make_face(mode=Mode.SUBTRACT)
        with BuildLine():
            Line((-36.96044354, -1.448664326), (-36.96044354, 1.501460053))
            ThreePointArc((-36.96044354, 1.501460053), (-38.253180873, 4.856486657), (-41.462924945, 6.476646004))
            Line((-41.462924945, 6.476646004), (-60.363421226, 8.366695632))
            ThreePointArc((-60.363421226, 8.366695632), (-64.986475465, 6.845187692), (-66.96044354, 2.396472491))
            Line((-66.96044354, 2.396472491), (-66.96044354, -2.343676764))
            ThreePointArc((-66.96044354, -2.343676764), (-64.986475465, -6.792391965), (-60.363421226, -8.313899905))
            Line((-60.363421226, -8.313899905), (-41.462924945, -6.423850277))
            ThreePointArc((-41.462924945, -6.423850277), (-38.253180873, -4.80369093), (-36.96044354, -1.448664326))
        make_face(mode=Mode.SUBTRACT)
        with BuildLine():
            Line((-30.767389062, 20.564063452), (-29.03334946, 22.95076421))
            ThreePointArc((-29.03334946, 22.95076421), (-28.107160772, 26.424889688), (-29.751592504, 29.622266363))
            Line((-29.751592504, 29.622266363), (-43.9314719, 42.260781608))
            ThreePointArc((-43.9314719, 42.260781608), (-48.565921273, 43.747218929), (-52.777784179, 41.308402052))
            Line((-52.777784179, 41.308402052), (-55.563974005, 37.473540749))
            ThreePointArc((-55.563974005, 37.473540749), (-56.581889472, 32.714185224), (-53.736079956, 28.765896342))
            Line((-53.736079956, 28.765896342), (-37.334313965, 19.185545636))
            ThreePointArc((-37.334313965, 19.185545636), (-33.785270692, 18.609641852), (-30.767389062, 20.564063452))
        make_face(mode=Mode.SUBTRACT)
        with BuildLine():
            Line((-12.818345991, 34.732548229), (-10.012610977, 35.644186797))
            ThreePointArc((-10.012610977, 35.644186797), (-7.221268868, 37.910413298), (-6.672271229, 41.463718086))
            Line((-6.672271229, 41.463718086), (-10.715301767, 60.02321569))
            ThreePointArc((-10.715301767, 60.02321569), (-13.590944134, 63.949829739), (-18.431913397, 64.452456339))
            Line((-18.431913397, 64.452456339), (-22.940063234, 62.987669664))
            ThreePointArc((-22.940063234, 62.987669664), (-26.561053133, 59.735585862), (-26.579490849, 54.868628193))
            Line((-26.579490849, 54.868628193), (-18.941372281, 37.477245499))
            ThreePointArc((-18.941372281, 37.477245499), (-16.40864371, 34.925254255), (-12.818345991, 34.732548229))
        make_face(mode=Mode.SUBTRACT)
    extrude(amount=DODANIE_WYCI_GNI_CIE1_DEPTH)

    # Sketch1 → Cut-Extrude1 (cut)
    with BuildSketch(Plane(origin=(0, 0, 0), x_dir=(-1, 0, 0), z_dir=(0, 0, -1))):
        with Locations((-17.67766953, 17.67766953)):
            Circle(SKETCH1_R)
        with Locations((17.67766953, 17.67766953)):
            Circle(SKETCH1_R)
        with Locations((17.67766953, -17.67766953)):
            Circle(SKETCH1_R)
        with Locations((-17.67766953, -17.67766953)):
            Circle(SKETCH1_R)
    extrude(amount=-CUT_EXTRUDE1_DEPTH, mode=Mode.SUBTRACT)

    # Chamfer1
    chamfer1_edges = [part.edges().sort_by_distance(p)[0] for p in [
        (-3.2, 25, 3),
        (21.8, 0, 3),
        (-3.2, -25, 3),
        (-28.2, 0, 3),
    ]]
    chamfer(chamfer1_edges, length=CHAMFER1_SIZE - 0.0001)  # a hair under: the kernel refuses the full size

    # Sketch2 → Cut-Extrude2 (cut)
    with BuildSketch(Plane.XY.offset(3)):
        Polygon((-5.15, 2.973353886), (-5.15, -2.973353886), (0, -5.946707773), (5.15, -2.973353886), (5.15, 2.973353886), (0, 5.946707773), align=None)
    extrude(amount=-CUT_EXTRUDE2_DEPTH, mode=Mode.SUBTRACT)


solid = part.part
